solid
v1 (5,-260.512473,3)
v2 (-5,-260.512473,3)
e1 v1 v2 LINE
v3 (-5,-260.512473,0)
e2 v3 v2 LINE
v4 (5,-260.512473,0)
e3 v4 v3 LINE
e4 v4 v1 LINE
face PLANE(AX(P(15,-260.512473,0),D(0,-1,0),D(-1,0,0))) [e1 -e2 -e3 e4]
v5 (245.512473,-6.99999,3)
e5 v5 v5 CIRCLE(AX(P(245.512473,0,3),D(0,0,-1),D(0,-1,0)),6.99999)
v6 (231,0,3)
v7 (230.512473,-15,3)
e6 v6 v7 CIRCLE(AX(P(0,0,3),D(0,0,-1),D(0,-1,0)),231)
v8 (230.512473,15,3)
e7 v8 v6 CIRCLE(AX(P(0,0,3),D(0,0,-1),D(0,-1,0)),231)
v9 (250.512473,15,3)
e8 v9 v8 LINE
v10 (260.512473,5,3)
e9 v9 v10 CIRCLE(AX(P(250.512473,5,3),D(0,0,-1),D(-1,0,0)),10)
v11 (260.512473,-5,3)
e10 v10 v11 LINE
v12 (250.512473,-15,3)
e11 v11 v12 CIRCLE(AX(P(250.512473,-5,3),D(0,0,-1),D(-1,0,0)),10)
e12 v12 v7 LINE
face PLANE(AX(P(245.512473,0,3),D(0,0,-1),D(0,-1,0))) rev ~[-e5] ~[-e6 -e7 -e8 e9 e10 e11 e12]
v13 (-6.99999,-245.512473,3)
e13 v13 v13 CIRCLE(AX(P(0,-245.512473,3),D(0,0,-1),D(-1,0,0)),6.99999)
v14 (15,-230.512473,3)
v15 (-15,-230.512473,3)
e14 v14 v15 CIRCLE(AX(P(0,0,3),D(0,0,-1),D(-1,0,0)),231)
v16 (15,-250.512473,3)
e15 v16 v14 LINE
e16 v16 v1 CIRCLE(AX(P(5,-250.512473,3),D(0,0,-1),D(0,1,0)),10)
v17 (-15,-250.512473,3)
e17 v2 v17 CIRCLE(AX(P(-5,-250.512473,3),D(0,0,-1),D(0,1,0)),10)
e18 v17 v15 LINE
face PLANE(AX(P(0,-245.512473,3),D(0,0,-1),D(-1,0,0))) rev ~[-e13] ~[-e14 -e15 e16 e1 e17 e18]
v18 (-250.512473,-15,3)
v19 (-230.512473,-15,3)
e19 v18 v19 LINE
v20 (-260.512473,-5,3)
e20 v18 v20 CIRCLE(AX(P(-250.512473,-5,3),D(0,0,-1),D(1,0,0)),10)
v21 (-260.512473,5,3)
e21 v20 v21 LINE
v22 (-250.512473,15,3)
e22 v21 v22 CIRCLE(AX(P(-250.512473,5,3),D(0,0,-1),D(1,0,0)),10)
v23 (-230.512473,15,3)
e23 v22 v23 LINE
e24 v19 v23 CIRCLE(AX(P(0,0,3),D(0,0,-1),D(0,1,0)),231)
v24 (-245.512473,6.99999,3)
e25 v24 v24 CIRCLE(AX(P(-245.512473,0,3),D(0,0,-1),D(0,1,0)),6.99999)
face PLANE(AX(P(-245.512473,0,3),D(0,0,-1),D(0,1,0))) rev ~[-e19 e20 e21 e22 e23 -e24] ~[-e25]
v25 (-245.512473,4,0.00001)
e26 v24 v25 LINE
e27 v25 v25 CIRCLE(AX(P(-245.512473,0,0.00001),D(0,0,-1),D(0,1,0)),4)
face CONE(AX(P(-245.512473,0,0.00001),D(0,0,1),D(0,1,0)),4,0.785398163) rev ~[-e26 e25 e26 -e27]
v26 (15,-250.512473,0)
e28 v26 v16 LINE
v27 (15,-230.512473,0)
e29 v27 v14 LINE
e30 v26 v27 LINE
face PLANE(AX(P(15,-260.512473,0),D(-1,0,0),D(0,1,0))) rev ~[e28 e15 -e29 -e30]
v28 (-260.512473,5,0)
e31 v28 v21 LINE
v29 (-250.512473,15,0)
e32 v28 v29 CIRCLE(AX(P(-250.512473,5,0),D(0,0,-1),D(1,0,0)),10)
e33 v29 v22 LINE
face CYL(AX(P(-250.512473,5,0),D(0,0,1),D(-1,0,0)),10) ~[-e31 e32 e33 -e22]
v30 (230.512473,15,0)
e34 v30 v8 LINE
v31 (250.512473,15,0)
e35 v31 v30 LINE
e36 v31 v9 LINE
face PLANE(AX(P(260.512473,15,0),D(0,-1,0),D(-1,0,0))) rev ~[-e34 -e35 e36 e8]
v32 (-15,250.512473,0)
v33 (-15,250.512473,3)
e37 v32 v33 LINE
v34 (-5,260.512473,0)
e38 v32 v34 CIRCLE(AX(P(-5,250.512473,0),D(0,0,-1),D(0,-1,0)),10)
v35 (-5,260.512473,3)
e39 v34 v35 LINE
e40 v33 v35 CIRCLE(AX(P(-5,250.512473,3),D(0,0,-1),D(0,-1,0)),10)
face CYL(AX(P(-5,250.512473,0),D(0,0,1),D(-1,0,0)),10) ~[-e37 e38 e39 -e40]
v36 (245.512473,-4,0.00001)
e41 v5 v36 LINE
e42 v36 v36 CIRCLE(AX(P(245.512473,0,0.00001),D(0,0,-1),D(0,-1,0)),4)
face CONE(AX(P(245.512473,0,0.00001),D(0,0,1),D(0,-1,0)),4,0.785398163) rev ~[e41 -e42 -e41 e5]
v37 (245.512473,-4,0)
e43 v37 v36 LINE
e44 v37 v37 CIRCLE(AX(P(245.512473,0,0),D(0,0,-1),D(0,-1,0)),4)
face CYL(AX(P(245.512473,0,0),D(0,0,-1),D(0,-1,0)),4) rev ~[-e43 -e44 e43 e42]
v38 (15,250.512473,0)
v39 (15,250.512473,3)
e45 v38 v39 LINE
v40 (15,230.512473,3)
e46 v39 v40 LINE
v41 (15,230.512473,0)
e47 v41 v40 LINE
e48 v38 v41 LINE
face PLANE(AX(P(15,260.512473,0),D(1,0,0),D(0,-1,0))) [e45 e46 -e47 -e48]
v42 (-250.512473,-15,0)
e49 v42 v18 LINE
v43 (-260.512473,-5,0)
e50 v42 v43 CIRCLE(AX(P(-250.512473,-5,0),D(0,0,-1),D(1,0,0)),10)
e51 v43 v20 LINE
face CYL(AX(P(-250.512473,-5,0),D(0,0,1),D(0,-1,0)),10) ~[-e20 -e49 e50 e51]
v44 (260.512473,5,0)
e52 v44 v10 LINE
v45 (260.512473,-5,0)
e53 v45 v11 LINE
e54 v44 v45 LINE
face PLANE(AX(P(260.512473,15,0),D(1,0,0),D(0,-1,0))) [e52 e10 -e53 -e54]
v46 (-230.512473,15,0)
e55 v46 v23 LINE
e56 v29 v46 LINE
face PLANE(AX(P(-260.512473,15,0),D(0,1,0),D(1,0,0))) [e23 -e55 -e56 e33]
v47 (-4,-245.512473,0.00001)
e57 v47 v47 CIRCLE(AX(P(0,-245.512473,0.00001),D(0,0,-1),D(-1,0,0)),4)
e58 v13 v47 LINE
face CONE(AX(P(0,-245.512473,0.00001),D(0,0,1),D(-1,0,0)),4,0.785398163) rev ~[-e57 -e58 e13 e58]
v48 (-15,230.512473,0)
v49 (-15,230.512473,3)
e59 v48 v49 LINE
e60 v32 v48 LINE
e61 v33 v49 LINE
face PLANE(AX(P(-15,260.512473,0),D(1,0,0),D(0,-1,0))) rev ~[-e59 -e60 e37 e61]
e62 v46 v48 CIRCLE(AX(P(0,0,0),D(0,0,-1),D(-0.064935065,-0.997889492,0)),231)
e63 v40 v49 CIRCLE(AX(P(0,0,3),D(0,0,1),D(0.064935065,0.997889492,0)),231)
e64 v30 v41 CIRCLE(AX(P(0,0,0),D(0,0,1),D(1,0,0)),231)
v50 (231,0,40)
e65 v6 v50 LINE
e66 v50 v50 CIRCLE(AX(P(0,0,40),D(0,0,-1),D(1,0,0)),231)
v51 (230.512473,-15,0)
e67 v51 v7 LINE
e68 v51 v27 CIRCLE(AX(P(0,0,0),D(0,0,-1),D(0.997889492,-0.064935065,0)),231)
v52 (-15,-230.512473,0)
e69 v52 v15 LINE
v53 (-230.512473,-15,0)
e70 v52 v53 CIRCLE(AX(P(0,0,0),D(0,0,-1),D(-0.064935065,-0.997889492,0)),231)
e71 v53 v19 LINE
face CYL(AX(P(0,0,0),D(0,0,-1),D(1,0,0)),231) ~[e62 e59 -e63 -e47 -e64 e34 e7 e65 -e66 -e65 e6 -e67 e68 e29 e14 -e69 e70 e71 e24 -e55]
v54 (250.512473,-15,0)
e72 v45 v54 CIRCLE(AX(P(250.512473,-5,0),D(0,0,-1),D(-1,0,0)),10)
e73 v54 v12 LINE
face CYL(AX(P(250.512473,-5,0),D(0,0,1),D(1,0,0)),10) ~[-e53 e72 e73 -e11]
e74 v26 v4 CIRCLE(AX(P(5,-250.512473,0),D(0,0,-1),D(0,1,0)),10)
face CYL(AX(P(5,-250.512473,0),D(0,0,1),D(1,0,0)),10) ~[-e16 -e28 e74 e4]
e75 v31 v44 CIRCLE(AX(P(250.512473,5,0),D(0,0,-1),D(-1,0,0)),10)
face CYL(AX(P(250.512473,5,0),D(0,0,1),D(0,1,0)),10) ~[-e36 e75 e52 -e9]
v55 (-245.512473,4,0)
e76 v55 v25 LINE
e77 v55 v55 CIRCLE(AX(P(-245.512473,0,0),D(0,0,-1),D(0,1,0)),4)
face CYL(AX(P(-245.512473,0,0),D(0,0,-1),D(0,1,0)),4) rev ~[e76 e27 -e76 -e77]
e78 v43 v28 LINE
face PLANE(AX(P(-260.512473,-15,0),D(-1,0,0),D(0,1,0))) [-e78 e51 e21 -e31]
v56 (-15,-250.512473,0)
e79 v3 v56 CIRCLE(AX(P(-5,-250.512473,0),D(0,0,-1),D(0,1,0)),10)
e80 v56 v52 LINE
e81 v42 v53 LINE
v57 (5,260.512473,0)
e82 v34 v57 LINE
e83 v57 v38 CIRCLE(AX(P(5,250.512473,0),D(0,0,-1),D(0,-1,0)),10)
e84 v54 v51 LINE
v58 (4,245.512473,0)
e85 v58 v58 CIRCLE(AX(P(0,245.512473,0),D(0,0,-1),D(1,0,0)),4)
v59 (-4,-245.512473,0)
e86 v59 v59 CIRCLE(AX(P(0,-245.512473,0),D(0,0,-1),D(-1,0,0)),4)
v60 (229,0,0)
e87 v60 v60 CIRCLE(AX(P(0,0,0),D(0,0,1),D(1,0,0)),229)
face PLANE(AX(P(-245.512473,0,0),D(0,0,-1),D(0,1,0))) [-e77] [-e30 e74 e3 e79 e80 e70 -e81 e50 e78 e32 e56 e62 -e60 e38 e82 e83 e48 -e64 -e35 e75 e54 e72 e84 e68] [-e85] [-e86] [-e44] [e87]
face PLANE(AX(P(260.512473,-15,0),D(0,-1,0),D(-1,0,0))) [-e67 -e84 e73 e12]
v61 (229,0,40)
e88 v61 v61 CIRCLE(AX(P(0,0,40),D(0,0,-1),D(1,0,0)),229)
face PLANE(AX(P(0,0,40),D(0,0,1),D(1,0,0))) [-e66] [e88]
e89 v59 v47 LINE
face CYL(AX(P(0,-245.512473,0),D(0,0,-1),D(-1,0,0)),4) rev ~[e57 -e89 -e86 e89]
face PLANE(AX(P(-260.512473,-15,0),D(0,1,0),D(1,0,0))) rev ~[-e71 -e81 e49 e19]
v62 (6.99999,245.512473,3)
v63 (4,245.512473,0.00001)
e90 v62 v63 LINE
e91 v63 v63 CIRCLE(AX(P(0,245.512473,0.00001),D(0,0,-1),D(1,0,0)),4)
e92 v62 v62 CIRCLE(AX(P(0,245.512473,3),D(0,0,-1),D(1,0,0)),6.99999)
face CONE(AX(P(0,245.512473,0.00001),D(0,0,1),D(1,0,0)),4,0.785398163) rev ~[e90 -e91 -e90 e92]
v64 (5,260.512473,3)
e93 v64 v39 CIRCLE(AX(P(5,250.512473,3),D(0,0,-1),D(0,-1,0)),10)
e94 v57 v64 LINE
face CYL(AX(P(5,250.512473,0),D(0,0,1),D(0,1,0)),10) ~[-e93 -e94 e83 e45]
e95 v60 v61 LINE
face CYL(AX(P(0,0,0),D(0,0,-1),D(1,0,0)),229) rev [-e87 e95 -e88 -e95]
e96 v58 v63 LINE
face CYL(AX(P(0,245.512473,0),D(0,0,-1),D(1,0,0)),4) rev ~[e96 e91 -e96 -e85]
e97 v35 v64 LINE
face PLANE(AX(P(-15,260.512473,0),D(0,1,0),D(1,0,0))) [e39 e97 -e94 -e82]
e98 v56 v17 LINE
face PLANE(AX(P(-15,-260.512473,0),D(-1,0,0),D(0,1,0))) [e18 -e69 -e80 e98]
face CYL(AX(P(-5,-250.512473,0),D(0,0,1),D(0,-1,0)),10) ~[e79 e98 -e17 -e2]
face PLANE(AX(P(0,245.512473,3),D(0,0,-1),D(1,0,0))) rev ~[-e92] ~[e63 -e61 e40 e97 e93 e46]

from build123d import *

# Parameters (mm, degrees)
F0_R     = 231
F0_R_2   = 229
F1_DEPTH = 40
F2_W     = 30
F2_H     = 30
F3_DEPTH = 3
F4_R     = 4
F5_DEPTH = 25
F6_R     = 10
F8_COUNT = 4
F9_SIZE  = 2.99999


# Not quite as in the source:
# - a fillet or chamfer is up to 0.001 mm smaller than in the source, because OpenCascade refuses the exact size


with BuildPart() as f1:
    # F0 (on Top) → F1 (new body)
    with BuildSketch(Plane.XY):
        Circle(F0_R)
        Circle(F0_R_2, mode=Mode.SUBTRACT)
    extrude(amount=F1_DEPTH)

    # F2 (on face) → F3 (join)
    with BuildSketch(Plane(origin=(0, 0, 0), x_dir=(1, 0, 0), z_dir=(0, 0, -1))):
        with Locations((0, -245.5124725476)):
            Rectangle(F2_W, F2_H)
    extrude(amount=-F3_DEPTH)

    # F4 (on face) → F5 (cut)
    with BuildSketch(Plane(origin=(0, 0, 0), x_dir=(1, 0, 0), z_dir=(0, 0, -1))):
        with Locations((0, -245.5124725476)):
            Circle(F4_R)
    extrude(amount=-F5_DEPTH, mode=Mode.SUBTRACT)

    # F6
    f6_edges = [f1.edges().sort_by_distance(p)[0] for p in [
        (-15, 260.512473, 1.5),
        (15, 260.512473, 1.5),
    ]]
    fillet(f6_edges, radius=F6_R)

    # F8: F1 ×4 about axis
    f8_axis = Axis((0, 0, -51.1162020266), (0, 0, -1))


with BuildPart() as f1_1:
    add(f1.part)
    for i in range(1, F8_COUNT):
        add(f1.part.rotate(f8_axis, i * 360 / F8_COUNT))

    # F9 (size 3 in the source; OpenCascade refuses exactly that, so slightly less here)
    f9_edges = [f1_1.edges().sort_by_distance(p)[0] for p in [
        (-245.512473, -4, 3),
        (-4, 245.512473, 3),
        (245.512473, 4, 3),
        (4, -245.512473, 3),
    ]]
    chamfer(f9_edges, length=F9_SIZE)


solid = f1_1.part
